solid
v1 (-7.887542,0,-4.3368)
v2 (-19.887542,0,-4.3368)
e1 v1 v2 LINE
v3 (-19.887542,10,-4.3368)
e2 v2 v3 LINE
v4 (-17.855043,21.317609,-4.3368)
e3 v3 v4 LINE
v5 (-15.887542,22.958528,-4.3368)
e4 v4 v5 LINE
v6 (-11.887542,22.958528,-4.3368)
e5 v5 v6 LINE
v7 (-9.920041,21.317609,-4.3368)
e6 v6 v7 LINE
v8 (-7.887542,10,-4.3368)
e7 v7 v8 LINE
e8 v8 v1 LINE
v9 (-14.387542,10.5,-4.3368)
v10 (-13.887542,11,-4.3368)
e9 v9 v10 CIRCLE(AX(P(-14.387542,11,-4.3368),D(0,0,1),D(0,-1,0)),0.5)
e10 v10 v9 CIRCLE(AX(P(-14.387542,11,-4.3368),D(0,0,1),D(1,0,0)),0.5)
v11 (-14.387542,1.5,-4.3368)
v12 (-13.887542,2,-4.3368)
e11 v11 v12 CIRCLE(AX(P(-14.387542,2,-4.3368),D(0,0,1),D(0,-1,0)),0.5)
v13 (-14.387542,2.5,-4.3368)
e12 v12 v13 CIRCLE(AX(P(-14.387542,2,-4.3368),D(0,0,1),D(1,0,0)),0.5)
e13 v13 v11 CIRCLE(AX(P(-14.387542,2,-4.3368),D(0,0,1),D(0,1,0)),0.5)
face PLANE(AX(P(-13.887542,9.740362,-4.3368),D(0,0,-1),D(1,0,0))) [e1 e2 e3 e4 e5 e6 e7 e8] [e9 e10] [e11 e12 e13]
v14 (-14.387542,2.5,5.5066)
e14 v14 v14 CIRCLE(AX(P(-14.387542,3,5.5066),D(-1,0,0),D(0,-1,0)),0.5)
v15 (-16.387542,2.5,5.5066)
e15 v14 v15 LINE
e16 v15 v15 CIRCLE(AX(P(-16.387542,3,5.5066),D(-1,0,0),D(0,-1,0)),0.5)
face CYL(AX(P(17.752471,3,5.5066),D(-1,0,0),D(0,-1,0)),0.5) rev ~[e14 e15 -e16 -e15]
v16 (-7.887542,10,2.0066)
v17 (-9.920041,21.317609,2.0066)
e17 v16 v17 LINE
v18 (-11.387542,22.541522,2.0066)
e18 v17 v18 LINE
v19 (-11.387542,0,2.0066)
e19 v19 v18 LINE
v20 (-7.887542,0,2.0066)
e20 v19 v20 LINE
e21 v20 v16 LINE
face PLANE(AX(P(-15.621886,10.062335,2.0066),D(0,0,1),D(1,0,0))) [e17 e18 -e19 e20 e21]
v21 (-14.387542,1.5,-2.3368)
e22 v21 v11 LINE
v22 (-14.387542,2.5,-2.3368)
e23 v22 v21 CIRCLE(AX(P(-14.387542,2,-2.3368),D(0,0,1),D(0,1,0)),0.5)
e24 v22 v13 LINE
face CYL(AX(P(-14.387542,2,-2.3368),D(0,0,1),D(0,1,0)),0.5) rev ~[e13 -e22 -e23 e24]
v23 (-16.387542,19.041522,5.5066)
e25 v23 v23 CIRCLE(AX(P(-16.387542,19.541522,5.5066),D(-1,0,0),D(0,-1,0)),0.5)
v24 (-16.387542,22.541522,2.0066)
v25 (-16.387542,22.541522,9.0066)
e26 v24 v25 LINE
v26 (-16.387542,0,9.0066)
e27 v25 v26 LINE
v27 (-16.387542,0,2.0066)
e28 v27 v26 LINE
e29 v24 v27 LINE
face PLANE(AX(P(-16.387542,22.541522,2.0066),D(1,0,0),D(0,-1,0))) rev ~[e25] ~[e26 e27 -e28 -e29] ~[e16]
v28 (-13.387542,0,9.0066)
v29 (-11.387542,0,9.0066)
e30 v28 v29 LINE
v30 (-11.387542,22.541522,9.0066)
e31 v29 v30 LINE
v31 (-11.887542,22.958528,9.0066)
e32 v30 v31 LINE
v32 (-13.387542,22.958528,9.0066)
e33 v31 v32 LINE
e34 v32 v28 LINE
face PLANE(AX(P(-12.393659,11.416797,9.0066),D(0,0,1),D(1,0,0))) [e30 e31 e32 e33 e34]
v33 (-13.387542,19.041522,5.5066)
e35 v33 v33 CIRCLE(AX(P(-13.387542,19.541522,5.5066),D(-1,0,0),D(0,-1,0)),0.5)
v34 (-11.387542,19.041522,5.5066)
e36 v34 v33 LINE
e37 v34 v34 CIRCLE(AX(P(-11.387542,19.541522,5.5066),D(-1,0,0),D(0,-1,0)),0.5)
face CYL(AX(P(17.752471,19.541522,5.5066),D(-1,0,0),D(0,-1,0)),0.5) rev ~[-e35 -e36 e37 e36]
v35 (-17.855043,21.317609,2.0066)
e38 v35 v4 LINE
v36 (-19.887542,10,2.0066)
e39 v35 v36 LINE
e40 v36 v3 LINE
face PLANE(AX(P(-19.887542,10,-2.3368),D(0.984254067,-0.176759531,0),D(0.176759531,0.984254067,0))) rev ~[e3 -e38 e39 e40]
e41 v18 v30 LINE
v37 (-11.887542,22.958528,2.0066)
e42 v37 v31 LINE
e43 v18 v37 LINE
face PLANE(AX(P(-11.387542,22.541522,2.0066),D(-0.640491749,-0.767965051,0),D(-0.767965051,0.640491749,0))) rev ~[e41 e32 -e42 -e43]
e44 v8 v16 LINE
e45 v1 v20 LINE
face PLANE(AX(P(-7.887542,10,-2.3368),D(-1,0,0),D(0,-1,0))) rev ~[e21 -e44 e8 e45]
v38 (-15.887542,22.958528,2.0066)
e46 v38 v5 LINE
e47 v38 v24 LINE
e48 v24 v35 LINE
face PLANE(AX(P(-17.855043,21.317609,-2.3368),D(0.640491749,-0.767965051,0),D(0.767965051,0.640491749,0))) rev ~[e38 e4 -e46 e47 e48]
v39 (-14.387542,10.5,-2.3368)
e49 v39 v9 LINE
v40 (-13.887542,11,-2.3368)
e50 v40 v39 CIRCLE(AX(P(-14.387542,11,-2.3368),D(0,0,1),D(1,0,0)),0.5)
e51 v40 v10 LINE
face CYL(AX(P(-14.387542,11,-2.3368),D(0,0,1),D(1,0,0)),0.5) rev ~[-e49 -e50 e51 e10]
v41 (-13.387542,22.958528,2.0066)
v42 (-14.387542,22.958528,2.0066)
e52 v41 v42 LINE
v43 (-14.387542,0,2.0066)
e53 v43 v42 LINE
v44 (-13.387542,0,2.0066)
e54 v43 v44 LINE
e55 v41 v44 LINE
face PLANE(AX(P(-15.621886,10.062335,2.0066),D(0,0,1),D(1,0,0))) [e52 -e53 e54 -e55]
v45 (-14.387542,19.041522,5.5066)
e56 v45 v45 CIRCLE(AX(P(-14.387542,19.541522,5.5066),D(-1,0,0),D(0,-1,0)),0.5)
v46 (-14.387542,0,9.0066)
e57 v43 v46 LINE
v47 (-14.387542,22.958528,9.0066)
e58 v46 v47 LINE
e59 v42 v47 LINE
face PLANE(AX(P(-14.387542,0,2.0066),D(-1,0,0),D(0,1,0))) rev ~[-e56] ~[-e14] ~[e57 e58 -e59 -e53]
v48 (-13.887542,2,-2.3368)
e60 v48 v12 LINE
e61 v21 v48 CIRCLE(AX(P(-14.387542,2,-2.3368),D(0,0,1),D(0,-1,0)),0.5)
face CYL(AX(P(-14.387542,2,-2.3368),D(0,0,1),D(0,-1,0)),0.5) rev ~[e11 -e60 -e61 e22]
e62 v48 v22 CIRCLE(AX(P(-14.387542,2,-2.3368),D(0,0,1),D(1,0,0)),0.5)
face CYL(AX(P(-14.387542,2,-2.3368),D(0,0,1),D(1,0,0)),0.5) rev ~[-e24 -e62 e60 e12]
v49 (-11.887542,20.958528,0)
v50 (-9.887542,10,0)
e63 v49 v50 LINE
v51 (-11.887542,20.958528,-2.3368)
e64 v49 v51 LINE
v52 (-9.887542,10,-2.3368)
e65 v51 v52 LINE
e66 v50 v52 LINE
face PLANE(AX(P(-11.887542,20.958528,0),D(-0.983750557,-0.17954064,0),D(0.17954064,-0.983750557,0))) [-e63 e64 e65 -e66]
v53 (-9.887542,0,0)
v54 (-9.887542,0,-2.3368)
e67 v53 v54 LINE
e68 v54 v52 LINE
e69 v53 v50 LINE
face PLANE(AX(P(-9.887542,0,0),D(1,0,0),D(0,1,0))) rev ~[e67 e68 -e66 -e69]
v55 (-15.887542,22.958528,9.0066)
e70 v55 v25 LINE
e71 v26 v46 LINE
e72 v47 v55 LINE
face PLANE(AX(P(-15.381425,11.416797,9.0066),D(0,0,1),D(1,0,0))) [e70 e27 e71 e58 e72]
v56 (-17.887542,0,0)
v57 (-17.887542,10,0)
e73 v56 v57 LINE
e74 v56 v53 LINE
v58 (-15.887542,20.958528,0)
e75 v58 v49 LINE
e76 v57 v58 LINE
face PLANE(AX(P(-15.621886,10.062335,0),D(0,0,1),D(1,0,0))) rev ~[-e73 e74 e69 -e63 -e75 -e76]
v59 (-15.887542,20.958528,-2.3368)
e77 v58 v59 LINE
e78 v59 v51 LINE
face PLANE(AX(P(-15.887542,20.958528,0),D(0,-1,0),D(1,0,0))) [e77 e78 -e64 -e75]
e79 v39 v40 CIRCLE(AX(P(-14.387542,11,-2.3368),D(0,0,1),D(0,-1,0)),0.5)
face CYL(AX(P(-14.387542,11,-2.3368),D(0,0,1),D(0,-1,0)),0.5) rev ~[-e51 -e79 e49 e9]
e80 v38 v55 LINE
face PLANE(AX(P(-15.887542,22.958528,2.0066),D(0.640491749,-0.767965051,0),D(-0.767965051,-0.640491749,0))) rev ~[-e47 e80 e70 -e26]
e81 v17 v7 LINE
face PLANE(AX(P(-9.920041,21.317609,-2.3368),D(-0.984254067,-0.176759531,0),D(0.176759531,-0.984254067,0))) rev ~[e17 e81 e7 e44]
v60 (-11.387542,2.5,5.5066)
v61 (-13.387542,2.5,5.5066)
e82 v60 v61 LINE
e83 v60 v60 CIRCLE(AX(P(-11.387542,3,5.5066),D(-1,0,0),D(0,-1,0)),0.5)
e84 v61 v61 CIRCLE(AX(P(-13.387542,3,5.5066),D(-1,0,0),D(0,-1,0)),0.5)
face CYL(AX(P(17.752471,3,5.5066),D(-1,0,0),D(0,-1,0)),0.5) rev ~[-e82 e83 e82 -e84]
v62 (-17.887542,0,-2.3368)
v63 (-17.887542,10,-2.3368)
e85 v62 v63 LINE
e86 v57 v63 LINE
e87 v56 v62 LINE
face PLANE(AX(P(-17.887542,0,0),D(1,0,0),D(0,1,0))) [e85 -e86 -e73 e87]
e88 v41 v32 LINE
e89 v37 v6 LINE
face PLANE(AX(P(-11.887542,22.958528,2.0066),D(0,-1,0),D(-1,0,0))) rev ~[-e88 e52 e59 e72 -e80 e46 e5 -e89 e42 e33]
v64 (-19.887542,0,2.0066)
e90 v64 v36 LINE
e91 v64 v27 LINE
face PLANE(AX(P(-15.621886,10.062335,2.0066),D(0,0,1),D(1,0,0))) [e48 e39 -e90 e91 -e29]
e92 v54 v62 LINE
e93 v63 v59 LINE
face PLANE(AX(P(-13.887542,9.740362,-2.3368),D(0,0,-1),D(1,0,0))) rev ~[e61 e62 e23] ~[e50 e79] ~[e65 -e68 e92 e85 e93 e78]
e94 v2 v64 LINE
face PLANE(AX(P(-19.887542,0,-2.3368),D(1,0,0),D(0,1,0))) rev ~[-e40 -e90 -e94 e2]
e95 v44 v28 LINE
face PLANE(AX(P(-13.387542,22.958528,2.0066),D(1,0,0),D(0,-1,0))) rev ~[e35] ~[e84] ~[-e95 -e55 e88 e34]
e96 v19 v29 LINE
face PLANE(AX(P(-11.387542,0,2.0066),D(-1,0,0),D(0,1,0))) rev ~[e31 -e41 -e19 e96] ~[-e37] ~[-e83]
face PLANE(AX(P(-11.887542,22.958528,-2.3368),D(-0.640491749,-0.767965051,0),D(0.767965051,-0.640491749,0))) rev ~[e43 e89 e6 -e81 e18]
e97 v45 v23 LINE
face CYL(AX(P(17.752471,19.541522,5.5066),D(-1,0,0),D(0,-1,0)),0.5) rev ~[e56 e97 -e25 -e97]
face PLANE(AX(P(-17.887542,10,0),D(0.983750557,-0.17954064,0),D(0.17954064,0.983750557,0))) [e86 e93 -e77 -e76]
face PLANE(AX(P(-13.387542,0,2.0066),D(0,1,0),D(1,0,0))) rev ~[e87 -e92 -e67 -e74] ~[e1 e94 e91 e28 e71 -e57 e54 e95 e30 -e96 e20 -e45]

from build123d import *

# Parameters (mm, degrees)
F0_W     = 2
F0_H     = 10
F1_DEPTH = 2.3368
F2_DEPTH = 2.0066
F4_DEPTH = 2
F6_DEPTH = 7
F8_D     = 1


# Not quite as in the source:
# - a feature names something its author has since deleted; it is built from what else it names


with BuildPart() as f1:
    # F0 (on Top) → F1 (new body)
    with BuildSketch(Plane.XY):
        with Locations((-18.8875418854, 5)):
            Rectangle(F0_W, F0_H)
        with Locations((-8.8875418854, 5)):
            Rectangle(F0_W, F0_H)
        Polygon((-17.8550429996, 21.3176092022), (-15.8875418854, 20.9585279226), (-15.8875418854, 22.9585279226), align=None)
        Polygon((-11.8875418854, 22.9585279226), (-11.8875418854, 20.9585279226), (-9.9200407711, 21.3176092022), align=None)
        Polygon((-11.8875418854, 20.9585279226), (-9.8875418854, 10), (-7.8875418854, 10), (-9.9200407711, 21.3176092022), align=None)
        Polygon((-15.8875418854, 20.9585279226), (-13.8875418854, 20.9585279226), (-11.8875418854, 20.9585279226), (-11.8875418854, 22.9585279226), (-15.8875418854, 22.9585279226), align=None)
        Polygon((-19.8875418854, 10), (-17.8875418854, 10), (-15.8875418854, 20.9585279226), (-17.8550429996, 21.3176092022), align=None)
    extrude(amount=-F1_DEPTH)

    # F0 (on Top) → F2 (join)
    with BuildSketch(Plane.XY):
        Polygon((-17.8875418854, 10), (-17.8875418854, 0), (-13.8875418854, 0), (-13.8875418854, 20.9585279226), (-15.8875418854, 20.9585279226), align=None)
        with Locations((-18.8875418854, 5)):
            Rectangle(F0_W, F0_H)
        Polygon((-13.8875418854, 20.9585279226), (-13.8875418854, 0), (-9.8875418854, 0), (-9.8875418854, 10), (-11.8875418854, 20.9585279226), align=None)
        Polygon((-19.8875418854, 10), (-17.8875418854, 10), (-15.8875418854, 20.9585279226), (-17.8550429996, 21.3176092022), align=None)
        with Locations((-8.8875418854, 5)):
            Rectangle(F0_W, F0_H)
        Polygon((-15.8875418854, 20.9585279226), (-13.8875418854, 20.9585279226), (-11.8875418854, 20.9585279226), (-11.8875418854, 22.9585279226), (-15.8875418854, 22.9585279226), align=None)
        Polygon((-17.8550429996, 21.3176092022), (-15.8875418854, 20.9585279226), (-15.8875418854, 22.9585279226), align=None)
        Polygon((-11.8875418854, 20.9585279226), (-9.8875418854, 10), (-7.8875418854, 10), (-9.9200407711, 21.3176092022), align=None)
        Polygon((-11.8875418854, 22.9585279226), (-11.8875418854, 20.9585279226), (-9.9200407711, 21.3176092022), align=None)
    extrude(amount=F2_DEPTH)

    # F3 (on face) → F4 (join)
    with BuildSketch(Plane(origin=(0, 0, -2.3368), x_dir=(1, 0, 0), z_dir=(0, 0, -1))):
        Polygon((-14.3875418854, 0), (-17.8875418854, 0), (-17.8875418854, -10), (-15.8875418854, -20.9585279226), (-11.8875418854, -20.9585279226), (-9.8875418854, -10), (-9.8875418854, 0), align=None)
        with BuildLine():
            ThreePointArc((-13.8875418854, -11), (-14.7410952759, -11.3535533906), (-14.3875418854, -10.5))
            ThreePointArc((-14.3875418854, -10.5), (-14.0339884948, -10.6464466094), (-13.8875418854, -11))
        make_face(mode=Mode.SUBTRACT)
        with BuildLine():
            ThreePointArc((-14.3875418854, -2.5), (-14.8875418854, -2), (-14.3875418854, -1.5))
            ThreePointArc((-14.3875418854, -1.5), (-14.0339884948, -1.6464466094), (-13.8875418854, -2))
            ThreePointArc((-13.8875418854, -2), (-14.0339884948, -2.3535533906), (-14.3875418854, -2.5))
        make_face(mode=Mode.SUBTRACT)
        Polygon((-17.8875418854, 0), (-19.8875418854, 0), (-19.8875418854, -10), (-17.8550429996, -21.3176092022), (-15.8875418854, -22.9585279226), (-11.8875418854, -22.9585279226), (-9.9200407711, -21.3176092022), (-7.8875418854, -10), (-7.8875418854, 0), (-9.8875418854, 0), (-9.8875418854, -10), (-11.8875418854, -20.9585279226), (-15.8875418854, -20.9585279226), (-17.8875418854, -10), align=None)
    extrude(amount=F4_DEPTH)

    # F5 (on face) → F6 (join)
    with BuildSketch(Plane.XY.offset(2.0066)):
        Polygon((-13.3875418854, 22.9585279226), (-13.3875418854, 0), (-11.3875418854, 0), (-11.3875418854, 22.5415221307), (-11.8875418854, 22.9585279226), align=None)
        Polygon((-16.3875418854, 0), (-14.3875418854, 0), (-14.3875418854, 22.9585279226), (-15.8875418854, 22.9585279226), (-16.3875418854, 22.5415221307), align=None)
    extrude(amount=F6_DEPTH)

    # F8 (through all)
    with Locations(Plane.YZ.offset(-11.3875418854)):
        with Locations((3, 5.5066), (19.5415221307, 5.5066)):
            Hole(F8_D / 2)


solid = f1.part
